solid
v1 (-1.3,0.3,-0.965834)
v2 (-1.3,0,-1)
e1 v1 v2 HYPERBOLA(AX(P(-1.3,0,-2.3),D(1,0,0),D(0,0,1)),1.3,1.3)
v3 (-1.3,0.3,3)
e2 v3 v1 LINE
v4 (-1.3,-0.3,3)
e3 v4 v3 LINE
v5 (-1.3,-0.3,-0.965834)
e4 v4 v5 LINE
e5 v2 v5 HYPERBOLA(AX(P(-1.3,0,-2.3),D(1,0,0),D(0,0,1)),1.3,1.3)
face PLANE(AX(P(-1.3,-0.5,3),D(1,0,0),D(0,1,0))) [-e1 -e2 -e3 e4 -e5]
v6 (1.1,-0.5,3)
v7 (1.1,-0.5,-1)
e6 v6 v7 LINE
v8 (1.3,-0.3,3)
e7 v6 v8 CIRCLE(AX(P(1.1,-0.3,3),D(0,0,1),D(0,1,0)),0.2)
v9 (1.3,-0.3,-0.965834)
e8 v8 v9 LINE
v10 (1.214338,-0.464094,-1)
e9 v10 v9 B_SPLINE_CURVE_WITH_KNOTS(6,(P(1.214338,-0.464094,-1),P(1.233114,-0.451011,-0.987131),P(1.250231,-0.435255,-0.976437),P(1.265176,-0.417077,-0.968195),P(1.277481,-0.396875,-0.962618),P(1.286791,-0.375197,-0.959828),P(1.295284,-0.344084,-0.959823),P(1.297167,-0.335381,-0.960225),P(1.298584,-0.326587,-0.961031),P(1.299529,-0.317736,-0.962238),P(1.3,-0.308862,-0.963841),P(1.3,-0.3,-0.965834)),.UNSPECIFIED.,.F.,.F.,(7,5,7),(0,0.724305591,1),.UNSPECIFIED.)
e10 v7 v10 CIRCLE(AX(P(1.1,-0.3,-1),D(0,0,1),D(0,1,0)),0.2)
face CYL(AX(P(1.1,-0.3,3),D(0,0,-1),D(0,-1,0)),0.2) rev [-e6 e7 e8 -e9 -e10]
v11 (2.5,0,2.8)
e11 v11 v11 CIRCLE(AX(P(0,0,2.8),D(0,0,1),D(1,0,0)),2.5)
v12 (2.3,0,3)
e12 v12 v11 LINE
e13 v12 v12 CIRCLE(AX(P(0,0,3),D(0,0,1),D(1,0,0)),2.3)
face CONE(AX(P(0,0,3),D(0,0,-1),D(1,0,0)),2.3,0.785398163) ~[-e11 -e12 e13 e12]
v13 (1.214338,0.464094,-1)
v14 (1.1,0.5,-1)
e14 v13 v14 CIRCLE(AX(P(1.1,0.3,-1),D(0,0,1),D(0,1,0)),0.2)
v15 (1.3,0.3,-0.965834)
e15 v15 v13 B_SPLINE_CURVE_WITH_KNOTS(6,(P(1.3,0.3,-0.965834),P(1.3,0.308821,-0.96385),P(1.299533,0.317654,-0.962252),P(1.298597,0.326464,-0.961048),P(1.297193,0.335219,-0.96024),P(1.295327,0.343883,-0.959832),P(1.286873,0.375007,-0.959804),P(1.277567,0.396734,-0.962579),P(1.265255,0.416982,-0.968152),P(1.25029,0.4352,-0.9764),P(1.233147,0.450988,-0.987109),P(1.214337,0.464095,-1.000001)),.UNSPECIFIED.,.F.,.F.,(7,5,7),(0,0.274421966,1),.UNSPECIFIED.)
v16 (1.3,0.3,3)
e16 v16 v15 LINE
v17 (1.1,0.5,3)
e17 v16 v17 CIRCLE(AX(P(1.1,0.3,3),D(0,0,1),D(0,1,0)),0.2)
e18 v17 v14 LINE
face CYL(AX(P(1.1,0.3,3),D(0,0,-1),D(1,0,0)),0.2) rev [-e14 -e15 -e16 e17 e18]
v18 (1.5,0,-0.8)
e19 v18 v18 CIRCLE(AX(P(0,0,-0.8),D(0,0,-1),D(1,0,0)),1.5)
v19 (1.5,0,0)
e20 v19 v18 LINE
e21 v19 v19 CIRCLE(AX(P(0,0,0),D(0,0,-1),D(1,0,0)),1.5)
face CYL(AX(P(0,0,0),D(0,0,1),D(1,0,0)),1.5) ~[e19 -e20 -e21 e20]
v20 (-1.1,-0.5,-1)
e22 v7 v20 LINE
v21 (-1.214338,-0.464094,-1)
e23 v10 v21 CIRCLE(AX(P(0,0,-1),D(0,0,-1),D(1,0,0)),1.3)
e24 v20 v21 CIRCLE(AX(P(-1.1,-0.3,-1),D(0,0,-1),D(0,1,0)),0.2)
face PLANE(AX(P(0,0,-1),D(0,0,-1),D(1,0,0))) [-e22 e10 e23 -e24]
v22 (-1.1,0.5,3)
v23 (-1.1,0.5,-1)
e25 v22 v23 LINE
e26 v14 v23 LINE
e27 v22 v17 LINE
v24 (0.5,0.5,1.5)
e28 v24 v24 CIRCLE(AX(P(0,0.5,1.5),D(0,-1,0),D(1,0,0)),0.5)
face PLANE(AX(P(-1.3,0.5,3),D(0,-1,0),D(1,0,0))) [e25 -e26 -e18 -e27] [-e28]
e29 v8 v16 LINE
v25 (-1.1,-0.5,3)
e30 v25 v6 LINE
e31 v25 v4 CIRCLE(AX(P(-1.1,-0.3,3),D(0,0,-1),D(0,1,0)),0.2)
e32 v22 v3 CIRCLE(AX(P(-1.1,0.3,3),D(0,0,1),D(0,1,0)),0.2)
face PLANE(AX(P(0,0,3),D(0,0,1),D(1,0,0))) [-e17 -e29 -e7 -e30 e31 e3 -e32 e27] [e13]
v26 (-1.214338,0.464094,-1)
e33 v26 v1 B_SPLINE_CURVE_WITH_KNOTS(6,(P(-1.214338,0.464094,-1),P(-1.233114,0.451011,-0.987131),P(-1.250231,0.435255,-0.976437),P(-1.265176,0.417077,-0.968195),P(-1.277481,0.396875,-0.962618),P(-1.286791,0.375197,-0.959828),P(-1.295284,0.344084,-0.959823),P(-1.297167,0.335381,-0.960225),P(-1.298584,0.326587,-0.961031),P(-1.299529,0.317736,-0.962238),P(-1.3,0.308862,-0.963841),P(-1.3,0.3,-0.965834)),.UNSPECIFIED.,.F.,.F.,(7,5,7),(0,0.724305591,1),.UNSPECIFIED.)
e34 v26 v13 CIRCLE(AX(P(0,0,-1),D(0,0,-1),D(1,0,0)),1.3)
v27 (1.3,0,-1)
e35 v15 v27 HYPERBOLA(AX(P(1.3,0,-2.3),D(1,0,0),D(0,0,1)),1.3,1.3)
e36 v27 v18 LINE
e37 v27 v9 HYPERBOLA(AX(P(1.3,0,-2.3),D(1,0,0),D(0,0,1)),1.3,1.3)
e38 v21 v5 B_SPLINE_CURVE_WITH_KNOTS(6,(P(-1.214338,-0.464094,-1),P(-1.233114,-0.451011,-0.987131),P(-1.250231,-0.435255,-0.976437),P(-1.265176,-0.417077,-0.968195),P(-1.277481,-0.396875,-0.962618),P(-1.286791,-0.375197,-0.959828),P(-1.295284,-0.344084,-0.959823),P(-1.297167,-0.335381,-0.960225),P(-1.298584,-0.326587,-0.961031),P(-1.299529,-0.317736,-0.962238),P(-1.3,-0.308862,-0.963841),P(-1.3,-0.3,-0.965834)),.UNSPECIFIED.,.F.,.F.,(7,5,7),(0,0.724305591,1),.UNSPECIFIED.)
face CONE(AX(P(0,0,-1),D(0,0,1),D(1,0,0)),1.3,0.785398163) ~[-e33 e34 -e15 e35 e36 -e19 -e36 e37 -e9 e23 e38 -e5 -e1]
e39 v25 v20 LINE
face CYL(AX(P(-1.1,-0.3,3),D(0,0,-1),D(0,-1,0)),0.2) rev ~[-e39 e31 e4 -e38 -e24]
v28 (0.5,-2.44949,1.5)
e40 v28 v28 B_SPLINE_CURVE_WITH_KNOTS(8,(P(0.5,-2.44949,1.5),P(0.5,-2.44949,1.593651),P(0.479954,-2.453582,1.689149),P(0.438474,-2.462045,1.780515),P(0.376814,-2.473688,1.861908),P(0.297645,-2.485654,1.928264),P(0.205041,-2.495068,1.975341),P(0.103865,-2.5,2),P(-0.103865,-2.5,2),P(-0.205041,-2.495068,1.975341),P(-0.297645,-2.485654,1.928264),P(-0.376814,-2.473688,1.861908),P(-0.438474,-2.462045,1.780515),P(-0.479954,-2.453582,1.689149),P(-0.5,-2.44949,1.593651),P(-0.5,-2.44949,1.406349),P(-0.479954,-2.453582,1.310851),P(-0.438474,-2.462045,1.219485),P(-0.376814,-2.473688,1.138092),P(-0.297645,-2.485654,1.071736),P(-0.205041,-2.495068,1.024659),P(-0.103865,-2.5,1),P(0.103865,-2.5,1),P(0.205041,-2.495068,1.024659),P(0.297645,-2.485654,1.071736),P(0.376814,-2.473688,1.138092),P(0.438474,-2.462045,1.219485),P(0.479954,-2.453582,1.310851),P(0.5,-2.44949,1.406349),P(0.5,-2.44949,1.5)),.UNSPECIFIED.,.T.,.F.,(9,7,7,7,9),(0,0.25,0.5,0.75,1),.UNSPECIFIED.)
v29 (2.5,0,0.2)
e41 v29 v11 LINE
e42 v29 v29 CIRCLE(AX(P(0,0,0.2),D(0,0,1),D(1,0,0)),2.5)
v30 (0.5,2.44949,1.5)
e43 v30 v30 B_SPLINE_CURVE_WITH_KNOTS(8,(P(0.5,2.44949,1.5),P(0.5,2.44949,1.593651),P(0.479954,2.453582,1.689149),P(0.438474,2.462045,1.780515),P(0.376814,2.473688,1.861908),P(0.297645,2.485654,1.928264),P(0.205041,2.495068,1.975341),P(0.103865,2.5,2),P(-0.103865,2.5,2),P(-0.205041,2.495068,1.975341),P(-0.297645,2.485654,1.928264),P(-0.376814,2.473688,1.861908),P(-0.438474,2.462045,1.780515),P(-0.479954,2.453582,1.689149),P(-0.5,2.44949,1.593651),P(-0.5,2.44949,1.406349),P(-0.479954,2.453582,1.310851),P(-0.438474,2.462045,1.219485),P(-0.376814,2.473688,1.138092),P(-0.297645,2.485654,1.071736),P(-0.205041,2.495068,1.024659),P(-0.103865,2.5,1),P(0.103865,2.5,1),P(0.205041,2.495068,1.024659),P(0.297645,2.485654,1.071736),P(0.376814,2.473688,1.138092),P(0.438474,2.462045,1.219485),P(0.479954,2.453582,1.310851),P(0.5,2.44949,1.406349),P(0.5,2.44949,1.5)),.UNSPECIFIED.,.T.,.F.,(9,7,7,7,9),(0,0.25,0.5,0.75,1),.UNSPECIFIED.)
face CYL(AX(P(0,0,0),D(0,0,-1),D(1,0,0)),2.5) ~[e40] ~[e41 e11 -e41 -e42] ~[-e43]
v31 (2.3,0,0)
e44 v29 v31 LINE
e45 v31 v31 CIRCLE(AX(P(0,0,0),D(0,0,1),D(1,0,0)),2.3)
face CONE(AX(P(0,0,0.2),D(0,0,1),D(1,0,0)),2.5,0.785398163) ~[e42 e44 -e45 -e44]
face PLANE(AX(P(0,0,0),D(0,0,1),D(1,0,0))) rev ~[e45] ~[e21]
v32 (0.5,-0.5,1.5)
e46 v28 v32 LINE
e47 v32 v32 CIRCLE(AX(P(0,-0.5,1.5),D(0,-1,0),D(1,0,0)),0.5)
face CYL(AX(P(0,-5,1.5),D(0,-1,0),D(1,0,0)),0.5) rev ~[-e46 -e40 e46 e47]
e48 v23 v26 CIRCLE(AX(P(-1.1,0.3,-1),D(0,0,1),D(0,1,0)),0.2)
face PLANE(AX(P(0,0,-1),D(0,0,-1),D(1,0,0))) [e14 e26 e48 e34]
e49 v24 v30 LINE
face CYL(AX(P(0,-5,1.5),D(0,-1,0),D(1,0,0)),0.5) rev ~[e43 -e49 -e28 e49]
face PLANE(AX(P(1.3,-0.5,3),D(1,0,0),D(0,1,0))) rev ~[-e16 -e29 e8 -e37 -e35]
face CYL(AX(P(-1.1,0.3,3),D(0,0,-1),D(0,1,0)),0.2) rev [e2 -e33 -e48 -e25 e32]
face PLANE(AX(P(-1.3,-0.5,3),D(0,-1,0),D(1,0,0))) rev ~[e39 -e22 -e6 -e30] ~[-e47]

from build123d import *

# Parameters (mm, degrees)
F0_R     = 2.5
F1_DEPTH = 3
F2_R     = 1.5
F3_DEPTH = 1
F5_R     = 0.5
F6_DEPTH = 7.501
F7_W     = 2.6
F7_H     = 1
F8_DEPTH = 4.001
F9_R     = 0.2


# Not quite as in the source:
# - a fillet or chamfer that OpenCascade refuses, or shapes differently, is made with other operations: its cross-section is extruded or revolved along the edge and cut away or added


with BuildPart() as f1:
    # F0 (on Top) → F1 (new body)
    with BuildSketch(Plane.XY):
        Circle(F0_R)
    extrude(amount=F1_DEPTH)

    # F2 (on face) → F3 (join)
    with BuildSketch(Plane(origin=(0, 0, 0), x_dir=(1, 0, 0), z_dir=(0, 0, -1))):
        Circle(F2_R)
    extrude(amount=F3_DEPTH)

    # F5 (on offset) → F6 (cut, through all)
    with BuildSketch(Plane.XZ.offset(5)):
        with Locations((0, 1.5)):
            Circle(F5_R)
    extrude(amount=-F6_DEPTH, mode=Mode.SUBTRACT)

    # F7 (on face) → F8 (cut, through all)
    with BuildSketch(Plane.XY.offset(3)):
        Rectangle(F7_W, F7_H)
    extrude(amount=-F8_DEPTH, mode=Mode.SUBTRACT)

    # F9
    f9_edges = [f1.edges().sort_by_distance(p)[0] for p in [
        (-1.3, 0.5, 1),
        (-1.3, -0.5, 1),
        (1.3, -0.5, 1),
        (1.3, 0.5, 1),
    ]]
    fillet(f9_edges, radius=F9_R)

    # F10: chamfer of 0.2 on 3 edges, made by hand

    # F10_s1 → F10_t2 (revolve, cut)
    with BuildSketch(Plane.XZ):
        Polygon((2.3, 3), (2.5, 2.8), (2.5, 3), align=None)
    revolve(axis=Axis((0, 0, 3), (0, 0, 1)), mode=Mode.SUBTRACT)

    # F10_s3 → F10_t4 (revolve, cut)
    with BuildSketch(Plane.XZ):
        Polygon((2.5, 0.2), (2.3, 0), (2.5, 0), align=None)
    revolve(axis=Axis((0, 0, 0), (0, 0, 1)), mode=Mode.SUBTRACT)

    # F10_s5 → F10_t6 (revolve, cut)
    with BuildSketch(Plane.XZ):
        Polygon((1.3, -1), (1.5, -0.8), (1.5, -1), align=None)
    revolve(axis=Axis((0, 0, -1), (0, 0, -1)), mode=Mode.SUBTRACT)


solid = f1.part
